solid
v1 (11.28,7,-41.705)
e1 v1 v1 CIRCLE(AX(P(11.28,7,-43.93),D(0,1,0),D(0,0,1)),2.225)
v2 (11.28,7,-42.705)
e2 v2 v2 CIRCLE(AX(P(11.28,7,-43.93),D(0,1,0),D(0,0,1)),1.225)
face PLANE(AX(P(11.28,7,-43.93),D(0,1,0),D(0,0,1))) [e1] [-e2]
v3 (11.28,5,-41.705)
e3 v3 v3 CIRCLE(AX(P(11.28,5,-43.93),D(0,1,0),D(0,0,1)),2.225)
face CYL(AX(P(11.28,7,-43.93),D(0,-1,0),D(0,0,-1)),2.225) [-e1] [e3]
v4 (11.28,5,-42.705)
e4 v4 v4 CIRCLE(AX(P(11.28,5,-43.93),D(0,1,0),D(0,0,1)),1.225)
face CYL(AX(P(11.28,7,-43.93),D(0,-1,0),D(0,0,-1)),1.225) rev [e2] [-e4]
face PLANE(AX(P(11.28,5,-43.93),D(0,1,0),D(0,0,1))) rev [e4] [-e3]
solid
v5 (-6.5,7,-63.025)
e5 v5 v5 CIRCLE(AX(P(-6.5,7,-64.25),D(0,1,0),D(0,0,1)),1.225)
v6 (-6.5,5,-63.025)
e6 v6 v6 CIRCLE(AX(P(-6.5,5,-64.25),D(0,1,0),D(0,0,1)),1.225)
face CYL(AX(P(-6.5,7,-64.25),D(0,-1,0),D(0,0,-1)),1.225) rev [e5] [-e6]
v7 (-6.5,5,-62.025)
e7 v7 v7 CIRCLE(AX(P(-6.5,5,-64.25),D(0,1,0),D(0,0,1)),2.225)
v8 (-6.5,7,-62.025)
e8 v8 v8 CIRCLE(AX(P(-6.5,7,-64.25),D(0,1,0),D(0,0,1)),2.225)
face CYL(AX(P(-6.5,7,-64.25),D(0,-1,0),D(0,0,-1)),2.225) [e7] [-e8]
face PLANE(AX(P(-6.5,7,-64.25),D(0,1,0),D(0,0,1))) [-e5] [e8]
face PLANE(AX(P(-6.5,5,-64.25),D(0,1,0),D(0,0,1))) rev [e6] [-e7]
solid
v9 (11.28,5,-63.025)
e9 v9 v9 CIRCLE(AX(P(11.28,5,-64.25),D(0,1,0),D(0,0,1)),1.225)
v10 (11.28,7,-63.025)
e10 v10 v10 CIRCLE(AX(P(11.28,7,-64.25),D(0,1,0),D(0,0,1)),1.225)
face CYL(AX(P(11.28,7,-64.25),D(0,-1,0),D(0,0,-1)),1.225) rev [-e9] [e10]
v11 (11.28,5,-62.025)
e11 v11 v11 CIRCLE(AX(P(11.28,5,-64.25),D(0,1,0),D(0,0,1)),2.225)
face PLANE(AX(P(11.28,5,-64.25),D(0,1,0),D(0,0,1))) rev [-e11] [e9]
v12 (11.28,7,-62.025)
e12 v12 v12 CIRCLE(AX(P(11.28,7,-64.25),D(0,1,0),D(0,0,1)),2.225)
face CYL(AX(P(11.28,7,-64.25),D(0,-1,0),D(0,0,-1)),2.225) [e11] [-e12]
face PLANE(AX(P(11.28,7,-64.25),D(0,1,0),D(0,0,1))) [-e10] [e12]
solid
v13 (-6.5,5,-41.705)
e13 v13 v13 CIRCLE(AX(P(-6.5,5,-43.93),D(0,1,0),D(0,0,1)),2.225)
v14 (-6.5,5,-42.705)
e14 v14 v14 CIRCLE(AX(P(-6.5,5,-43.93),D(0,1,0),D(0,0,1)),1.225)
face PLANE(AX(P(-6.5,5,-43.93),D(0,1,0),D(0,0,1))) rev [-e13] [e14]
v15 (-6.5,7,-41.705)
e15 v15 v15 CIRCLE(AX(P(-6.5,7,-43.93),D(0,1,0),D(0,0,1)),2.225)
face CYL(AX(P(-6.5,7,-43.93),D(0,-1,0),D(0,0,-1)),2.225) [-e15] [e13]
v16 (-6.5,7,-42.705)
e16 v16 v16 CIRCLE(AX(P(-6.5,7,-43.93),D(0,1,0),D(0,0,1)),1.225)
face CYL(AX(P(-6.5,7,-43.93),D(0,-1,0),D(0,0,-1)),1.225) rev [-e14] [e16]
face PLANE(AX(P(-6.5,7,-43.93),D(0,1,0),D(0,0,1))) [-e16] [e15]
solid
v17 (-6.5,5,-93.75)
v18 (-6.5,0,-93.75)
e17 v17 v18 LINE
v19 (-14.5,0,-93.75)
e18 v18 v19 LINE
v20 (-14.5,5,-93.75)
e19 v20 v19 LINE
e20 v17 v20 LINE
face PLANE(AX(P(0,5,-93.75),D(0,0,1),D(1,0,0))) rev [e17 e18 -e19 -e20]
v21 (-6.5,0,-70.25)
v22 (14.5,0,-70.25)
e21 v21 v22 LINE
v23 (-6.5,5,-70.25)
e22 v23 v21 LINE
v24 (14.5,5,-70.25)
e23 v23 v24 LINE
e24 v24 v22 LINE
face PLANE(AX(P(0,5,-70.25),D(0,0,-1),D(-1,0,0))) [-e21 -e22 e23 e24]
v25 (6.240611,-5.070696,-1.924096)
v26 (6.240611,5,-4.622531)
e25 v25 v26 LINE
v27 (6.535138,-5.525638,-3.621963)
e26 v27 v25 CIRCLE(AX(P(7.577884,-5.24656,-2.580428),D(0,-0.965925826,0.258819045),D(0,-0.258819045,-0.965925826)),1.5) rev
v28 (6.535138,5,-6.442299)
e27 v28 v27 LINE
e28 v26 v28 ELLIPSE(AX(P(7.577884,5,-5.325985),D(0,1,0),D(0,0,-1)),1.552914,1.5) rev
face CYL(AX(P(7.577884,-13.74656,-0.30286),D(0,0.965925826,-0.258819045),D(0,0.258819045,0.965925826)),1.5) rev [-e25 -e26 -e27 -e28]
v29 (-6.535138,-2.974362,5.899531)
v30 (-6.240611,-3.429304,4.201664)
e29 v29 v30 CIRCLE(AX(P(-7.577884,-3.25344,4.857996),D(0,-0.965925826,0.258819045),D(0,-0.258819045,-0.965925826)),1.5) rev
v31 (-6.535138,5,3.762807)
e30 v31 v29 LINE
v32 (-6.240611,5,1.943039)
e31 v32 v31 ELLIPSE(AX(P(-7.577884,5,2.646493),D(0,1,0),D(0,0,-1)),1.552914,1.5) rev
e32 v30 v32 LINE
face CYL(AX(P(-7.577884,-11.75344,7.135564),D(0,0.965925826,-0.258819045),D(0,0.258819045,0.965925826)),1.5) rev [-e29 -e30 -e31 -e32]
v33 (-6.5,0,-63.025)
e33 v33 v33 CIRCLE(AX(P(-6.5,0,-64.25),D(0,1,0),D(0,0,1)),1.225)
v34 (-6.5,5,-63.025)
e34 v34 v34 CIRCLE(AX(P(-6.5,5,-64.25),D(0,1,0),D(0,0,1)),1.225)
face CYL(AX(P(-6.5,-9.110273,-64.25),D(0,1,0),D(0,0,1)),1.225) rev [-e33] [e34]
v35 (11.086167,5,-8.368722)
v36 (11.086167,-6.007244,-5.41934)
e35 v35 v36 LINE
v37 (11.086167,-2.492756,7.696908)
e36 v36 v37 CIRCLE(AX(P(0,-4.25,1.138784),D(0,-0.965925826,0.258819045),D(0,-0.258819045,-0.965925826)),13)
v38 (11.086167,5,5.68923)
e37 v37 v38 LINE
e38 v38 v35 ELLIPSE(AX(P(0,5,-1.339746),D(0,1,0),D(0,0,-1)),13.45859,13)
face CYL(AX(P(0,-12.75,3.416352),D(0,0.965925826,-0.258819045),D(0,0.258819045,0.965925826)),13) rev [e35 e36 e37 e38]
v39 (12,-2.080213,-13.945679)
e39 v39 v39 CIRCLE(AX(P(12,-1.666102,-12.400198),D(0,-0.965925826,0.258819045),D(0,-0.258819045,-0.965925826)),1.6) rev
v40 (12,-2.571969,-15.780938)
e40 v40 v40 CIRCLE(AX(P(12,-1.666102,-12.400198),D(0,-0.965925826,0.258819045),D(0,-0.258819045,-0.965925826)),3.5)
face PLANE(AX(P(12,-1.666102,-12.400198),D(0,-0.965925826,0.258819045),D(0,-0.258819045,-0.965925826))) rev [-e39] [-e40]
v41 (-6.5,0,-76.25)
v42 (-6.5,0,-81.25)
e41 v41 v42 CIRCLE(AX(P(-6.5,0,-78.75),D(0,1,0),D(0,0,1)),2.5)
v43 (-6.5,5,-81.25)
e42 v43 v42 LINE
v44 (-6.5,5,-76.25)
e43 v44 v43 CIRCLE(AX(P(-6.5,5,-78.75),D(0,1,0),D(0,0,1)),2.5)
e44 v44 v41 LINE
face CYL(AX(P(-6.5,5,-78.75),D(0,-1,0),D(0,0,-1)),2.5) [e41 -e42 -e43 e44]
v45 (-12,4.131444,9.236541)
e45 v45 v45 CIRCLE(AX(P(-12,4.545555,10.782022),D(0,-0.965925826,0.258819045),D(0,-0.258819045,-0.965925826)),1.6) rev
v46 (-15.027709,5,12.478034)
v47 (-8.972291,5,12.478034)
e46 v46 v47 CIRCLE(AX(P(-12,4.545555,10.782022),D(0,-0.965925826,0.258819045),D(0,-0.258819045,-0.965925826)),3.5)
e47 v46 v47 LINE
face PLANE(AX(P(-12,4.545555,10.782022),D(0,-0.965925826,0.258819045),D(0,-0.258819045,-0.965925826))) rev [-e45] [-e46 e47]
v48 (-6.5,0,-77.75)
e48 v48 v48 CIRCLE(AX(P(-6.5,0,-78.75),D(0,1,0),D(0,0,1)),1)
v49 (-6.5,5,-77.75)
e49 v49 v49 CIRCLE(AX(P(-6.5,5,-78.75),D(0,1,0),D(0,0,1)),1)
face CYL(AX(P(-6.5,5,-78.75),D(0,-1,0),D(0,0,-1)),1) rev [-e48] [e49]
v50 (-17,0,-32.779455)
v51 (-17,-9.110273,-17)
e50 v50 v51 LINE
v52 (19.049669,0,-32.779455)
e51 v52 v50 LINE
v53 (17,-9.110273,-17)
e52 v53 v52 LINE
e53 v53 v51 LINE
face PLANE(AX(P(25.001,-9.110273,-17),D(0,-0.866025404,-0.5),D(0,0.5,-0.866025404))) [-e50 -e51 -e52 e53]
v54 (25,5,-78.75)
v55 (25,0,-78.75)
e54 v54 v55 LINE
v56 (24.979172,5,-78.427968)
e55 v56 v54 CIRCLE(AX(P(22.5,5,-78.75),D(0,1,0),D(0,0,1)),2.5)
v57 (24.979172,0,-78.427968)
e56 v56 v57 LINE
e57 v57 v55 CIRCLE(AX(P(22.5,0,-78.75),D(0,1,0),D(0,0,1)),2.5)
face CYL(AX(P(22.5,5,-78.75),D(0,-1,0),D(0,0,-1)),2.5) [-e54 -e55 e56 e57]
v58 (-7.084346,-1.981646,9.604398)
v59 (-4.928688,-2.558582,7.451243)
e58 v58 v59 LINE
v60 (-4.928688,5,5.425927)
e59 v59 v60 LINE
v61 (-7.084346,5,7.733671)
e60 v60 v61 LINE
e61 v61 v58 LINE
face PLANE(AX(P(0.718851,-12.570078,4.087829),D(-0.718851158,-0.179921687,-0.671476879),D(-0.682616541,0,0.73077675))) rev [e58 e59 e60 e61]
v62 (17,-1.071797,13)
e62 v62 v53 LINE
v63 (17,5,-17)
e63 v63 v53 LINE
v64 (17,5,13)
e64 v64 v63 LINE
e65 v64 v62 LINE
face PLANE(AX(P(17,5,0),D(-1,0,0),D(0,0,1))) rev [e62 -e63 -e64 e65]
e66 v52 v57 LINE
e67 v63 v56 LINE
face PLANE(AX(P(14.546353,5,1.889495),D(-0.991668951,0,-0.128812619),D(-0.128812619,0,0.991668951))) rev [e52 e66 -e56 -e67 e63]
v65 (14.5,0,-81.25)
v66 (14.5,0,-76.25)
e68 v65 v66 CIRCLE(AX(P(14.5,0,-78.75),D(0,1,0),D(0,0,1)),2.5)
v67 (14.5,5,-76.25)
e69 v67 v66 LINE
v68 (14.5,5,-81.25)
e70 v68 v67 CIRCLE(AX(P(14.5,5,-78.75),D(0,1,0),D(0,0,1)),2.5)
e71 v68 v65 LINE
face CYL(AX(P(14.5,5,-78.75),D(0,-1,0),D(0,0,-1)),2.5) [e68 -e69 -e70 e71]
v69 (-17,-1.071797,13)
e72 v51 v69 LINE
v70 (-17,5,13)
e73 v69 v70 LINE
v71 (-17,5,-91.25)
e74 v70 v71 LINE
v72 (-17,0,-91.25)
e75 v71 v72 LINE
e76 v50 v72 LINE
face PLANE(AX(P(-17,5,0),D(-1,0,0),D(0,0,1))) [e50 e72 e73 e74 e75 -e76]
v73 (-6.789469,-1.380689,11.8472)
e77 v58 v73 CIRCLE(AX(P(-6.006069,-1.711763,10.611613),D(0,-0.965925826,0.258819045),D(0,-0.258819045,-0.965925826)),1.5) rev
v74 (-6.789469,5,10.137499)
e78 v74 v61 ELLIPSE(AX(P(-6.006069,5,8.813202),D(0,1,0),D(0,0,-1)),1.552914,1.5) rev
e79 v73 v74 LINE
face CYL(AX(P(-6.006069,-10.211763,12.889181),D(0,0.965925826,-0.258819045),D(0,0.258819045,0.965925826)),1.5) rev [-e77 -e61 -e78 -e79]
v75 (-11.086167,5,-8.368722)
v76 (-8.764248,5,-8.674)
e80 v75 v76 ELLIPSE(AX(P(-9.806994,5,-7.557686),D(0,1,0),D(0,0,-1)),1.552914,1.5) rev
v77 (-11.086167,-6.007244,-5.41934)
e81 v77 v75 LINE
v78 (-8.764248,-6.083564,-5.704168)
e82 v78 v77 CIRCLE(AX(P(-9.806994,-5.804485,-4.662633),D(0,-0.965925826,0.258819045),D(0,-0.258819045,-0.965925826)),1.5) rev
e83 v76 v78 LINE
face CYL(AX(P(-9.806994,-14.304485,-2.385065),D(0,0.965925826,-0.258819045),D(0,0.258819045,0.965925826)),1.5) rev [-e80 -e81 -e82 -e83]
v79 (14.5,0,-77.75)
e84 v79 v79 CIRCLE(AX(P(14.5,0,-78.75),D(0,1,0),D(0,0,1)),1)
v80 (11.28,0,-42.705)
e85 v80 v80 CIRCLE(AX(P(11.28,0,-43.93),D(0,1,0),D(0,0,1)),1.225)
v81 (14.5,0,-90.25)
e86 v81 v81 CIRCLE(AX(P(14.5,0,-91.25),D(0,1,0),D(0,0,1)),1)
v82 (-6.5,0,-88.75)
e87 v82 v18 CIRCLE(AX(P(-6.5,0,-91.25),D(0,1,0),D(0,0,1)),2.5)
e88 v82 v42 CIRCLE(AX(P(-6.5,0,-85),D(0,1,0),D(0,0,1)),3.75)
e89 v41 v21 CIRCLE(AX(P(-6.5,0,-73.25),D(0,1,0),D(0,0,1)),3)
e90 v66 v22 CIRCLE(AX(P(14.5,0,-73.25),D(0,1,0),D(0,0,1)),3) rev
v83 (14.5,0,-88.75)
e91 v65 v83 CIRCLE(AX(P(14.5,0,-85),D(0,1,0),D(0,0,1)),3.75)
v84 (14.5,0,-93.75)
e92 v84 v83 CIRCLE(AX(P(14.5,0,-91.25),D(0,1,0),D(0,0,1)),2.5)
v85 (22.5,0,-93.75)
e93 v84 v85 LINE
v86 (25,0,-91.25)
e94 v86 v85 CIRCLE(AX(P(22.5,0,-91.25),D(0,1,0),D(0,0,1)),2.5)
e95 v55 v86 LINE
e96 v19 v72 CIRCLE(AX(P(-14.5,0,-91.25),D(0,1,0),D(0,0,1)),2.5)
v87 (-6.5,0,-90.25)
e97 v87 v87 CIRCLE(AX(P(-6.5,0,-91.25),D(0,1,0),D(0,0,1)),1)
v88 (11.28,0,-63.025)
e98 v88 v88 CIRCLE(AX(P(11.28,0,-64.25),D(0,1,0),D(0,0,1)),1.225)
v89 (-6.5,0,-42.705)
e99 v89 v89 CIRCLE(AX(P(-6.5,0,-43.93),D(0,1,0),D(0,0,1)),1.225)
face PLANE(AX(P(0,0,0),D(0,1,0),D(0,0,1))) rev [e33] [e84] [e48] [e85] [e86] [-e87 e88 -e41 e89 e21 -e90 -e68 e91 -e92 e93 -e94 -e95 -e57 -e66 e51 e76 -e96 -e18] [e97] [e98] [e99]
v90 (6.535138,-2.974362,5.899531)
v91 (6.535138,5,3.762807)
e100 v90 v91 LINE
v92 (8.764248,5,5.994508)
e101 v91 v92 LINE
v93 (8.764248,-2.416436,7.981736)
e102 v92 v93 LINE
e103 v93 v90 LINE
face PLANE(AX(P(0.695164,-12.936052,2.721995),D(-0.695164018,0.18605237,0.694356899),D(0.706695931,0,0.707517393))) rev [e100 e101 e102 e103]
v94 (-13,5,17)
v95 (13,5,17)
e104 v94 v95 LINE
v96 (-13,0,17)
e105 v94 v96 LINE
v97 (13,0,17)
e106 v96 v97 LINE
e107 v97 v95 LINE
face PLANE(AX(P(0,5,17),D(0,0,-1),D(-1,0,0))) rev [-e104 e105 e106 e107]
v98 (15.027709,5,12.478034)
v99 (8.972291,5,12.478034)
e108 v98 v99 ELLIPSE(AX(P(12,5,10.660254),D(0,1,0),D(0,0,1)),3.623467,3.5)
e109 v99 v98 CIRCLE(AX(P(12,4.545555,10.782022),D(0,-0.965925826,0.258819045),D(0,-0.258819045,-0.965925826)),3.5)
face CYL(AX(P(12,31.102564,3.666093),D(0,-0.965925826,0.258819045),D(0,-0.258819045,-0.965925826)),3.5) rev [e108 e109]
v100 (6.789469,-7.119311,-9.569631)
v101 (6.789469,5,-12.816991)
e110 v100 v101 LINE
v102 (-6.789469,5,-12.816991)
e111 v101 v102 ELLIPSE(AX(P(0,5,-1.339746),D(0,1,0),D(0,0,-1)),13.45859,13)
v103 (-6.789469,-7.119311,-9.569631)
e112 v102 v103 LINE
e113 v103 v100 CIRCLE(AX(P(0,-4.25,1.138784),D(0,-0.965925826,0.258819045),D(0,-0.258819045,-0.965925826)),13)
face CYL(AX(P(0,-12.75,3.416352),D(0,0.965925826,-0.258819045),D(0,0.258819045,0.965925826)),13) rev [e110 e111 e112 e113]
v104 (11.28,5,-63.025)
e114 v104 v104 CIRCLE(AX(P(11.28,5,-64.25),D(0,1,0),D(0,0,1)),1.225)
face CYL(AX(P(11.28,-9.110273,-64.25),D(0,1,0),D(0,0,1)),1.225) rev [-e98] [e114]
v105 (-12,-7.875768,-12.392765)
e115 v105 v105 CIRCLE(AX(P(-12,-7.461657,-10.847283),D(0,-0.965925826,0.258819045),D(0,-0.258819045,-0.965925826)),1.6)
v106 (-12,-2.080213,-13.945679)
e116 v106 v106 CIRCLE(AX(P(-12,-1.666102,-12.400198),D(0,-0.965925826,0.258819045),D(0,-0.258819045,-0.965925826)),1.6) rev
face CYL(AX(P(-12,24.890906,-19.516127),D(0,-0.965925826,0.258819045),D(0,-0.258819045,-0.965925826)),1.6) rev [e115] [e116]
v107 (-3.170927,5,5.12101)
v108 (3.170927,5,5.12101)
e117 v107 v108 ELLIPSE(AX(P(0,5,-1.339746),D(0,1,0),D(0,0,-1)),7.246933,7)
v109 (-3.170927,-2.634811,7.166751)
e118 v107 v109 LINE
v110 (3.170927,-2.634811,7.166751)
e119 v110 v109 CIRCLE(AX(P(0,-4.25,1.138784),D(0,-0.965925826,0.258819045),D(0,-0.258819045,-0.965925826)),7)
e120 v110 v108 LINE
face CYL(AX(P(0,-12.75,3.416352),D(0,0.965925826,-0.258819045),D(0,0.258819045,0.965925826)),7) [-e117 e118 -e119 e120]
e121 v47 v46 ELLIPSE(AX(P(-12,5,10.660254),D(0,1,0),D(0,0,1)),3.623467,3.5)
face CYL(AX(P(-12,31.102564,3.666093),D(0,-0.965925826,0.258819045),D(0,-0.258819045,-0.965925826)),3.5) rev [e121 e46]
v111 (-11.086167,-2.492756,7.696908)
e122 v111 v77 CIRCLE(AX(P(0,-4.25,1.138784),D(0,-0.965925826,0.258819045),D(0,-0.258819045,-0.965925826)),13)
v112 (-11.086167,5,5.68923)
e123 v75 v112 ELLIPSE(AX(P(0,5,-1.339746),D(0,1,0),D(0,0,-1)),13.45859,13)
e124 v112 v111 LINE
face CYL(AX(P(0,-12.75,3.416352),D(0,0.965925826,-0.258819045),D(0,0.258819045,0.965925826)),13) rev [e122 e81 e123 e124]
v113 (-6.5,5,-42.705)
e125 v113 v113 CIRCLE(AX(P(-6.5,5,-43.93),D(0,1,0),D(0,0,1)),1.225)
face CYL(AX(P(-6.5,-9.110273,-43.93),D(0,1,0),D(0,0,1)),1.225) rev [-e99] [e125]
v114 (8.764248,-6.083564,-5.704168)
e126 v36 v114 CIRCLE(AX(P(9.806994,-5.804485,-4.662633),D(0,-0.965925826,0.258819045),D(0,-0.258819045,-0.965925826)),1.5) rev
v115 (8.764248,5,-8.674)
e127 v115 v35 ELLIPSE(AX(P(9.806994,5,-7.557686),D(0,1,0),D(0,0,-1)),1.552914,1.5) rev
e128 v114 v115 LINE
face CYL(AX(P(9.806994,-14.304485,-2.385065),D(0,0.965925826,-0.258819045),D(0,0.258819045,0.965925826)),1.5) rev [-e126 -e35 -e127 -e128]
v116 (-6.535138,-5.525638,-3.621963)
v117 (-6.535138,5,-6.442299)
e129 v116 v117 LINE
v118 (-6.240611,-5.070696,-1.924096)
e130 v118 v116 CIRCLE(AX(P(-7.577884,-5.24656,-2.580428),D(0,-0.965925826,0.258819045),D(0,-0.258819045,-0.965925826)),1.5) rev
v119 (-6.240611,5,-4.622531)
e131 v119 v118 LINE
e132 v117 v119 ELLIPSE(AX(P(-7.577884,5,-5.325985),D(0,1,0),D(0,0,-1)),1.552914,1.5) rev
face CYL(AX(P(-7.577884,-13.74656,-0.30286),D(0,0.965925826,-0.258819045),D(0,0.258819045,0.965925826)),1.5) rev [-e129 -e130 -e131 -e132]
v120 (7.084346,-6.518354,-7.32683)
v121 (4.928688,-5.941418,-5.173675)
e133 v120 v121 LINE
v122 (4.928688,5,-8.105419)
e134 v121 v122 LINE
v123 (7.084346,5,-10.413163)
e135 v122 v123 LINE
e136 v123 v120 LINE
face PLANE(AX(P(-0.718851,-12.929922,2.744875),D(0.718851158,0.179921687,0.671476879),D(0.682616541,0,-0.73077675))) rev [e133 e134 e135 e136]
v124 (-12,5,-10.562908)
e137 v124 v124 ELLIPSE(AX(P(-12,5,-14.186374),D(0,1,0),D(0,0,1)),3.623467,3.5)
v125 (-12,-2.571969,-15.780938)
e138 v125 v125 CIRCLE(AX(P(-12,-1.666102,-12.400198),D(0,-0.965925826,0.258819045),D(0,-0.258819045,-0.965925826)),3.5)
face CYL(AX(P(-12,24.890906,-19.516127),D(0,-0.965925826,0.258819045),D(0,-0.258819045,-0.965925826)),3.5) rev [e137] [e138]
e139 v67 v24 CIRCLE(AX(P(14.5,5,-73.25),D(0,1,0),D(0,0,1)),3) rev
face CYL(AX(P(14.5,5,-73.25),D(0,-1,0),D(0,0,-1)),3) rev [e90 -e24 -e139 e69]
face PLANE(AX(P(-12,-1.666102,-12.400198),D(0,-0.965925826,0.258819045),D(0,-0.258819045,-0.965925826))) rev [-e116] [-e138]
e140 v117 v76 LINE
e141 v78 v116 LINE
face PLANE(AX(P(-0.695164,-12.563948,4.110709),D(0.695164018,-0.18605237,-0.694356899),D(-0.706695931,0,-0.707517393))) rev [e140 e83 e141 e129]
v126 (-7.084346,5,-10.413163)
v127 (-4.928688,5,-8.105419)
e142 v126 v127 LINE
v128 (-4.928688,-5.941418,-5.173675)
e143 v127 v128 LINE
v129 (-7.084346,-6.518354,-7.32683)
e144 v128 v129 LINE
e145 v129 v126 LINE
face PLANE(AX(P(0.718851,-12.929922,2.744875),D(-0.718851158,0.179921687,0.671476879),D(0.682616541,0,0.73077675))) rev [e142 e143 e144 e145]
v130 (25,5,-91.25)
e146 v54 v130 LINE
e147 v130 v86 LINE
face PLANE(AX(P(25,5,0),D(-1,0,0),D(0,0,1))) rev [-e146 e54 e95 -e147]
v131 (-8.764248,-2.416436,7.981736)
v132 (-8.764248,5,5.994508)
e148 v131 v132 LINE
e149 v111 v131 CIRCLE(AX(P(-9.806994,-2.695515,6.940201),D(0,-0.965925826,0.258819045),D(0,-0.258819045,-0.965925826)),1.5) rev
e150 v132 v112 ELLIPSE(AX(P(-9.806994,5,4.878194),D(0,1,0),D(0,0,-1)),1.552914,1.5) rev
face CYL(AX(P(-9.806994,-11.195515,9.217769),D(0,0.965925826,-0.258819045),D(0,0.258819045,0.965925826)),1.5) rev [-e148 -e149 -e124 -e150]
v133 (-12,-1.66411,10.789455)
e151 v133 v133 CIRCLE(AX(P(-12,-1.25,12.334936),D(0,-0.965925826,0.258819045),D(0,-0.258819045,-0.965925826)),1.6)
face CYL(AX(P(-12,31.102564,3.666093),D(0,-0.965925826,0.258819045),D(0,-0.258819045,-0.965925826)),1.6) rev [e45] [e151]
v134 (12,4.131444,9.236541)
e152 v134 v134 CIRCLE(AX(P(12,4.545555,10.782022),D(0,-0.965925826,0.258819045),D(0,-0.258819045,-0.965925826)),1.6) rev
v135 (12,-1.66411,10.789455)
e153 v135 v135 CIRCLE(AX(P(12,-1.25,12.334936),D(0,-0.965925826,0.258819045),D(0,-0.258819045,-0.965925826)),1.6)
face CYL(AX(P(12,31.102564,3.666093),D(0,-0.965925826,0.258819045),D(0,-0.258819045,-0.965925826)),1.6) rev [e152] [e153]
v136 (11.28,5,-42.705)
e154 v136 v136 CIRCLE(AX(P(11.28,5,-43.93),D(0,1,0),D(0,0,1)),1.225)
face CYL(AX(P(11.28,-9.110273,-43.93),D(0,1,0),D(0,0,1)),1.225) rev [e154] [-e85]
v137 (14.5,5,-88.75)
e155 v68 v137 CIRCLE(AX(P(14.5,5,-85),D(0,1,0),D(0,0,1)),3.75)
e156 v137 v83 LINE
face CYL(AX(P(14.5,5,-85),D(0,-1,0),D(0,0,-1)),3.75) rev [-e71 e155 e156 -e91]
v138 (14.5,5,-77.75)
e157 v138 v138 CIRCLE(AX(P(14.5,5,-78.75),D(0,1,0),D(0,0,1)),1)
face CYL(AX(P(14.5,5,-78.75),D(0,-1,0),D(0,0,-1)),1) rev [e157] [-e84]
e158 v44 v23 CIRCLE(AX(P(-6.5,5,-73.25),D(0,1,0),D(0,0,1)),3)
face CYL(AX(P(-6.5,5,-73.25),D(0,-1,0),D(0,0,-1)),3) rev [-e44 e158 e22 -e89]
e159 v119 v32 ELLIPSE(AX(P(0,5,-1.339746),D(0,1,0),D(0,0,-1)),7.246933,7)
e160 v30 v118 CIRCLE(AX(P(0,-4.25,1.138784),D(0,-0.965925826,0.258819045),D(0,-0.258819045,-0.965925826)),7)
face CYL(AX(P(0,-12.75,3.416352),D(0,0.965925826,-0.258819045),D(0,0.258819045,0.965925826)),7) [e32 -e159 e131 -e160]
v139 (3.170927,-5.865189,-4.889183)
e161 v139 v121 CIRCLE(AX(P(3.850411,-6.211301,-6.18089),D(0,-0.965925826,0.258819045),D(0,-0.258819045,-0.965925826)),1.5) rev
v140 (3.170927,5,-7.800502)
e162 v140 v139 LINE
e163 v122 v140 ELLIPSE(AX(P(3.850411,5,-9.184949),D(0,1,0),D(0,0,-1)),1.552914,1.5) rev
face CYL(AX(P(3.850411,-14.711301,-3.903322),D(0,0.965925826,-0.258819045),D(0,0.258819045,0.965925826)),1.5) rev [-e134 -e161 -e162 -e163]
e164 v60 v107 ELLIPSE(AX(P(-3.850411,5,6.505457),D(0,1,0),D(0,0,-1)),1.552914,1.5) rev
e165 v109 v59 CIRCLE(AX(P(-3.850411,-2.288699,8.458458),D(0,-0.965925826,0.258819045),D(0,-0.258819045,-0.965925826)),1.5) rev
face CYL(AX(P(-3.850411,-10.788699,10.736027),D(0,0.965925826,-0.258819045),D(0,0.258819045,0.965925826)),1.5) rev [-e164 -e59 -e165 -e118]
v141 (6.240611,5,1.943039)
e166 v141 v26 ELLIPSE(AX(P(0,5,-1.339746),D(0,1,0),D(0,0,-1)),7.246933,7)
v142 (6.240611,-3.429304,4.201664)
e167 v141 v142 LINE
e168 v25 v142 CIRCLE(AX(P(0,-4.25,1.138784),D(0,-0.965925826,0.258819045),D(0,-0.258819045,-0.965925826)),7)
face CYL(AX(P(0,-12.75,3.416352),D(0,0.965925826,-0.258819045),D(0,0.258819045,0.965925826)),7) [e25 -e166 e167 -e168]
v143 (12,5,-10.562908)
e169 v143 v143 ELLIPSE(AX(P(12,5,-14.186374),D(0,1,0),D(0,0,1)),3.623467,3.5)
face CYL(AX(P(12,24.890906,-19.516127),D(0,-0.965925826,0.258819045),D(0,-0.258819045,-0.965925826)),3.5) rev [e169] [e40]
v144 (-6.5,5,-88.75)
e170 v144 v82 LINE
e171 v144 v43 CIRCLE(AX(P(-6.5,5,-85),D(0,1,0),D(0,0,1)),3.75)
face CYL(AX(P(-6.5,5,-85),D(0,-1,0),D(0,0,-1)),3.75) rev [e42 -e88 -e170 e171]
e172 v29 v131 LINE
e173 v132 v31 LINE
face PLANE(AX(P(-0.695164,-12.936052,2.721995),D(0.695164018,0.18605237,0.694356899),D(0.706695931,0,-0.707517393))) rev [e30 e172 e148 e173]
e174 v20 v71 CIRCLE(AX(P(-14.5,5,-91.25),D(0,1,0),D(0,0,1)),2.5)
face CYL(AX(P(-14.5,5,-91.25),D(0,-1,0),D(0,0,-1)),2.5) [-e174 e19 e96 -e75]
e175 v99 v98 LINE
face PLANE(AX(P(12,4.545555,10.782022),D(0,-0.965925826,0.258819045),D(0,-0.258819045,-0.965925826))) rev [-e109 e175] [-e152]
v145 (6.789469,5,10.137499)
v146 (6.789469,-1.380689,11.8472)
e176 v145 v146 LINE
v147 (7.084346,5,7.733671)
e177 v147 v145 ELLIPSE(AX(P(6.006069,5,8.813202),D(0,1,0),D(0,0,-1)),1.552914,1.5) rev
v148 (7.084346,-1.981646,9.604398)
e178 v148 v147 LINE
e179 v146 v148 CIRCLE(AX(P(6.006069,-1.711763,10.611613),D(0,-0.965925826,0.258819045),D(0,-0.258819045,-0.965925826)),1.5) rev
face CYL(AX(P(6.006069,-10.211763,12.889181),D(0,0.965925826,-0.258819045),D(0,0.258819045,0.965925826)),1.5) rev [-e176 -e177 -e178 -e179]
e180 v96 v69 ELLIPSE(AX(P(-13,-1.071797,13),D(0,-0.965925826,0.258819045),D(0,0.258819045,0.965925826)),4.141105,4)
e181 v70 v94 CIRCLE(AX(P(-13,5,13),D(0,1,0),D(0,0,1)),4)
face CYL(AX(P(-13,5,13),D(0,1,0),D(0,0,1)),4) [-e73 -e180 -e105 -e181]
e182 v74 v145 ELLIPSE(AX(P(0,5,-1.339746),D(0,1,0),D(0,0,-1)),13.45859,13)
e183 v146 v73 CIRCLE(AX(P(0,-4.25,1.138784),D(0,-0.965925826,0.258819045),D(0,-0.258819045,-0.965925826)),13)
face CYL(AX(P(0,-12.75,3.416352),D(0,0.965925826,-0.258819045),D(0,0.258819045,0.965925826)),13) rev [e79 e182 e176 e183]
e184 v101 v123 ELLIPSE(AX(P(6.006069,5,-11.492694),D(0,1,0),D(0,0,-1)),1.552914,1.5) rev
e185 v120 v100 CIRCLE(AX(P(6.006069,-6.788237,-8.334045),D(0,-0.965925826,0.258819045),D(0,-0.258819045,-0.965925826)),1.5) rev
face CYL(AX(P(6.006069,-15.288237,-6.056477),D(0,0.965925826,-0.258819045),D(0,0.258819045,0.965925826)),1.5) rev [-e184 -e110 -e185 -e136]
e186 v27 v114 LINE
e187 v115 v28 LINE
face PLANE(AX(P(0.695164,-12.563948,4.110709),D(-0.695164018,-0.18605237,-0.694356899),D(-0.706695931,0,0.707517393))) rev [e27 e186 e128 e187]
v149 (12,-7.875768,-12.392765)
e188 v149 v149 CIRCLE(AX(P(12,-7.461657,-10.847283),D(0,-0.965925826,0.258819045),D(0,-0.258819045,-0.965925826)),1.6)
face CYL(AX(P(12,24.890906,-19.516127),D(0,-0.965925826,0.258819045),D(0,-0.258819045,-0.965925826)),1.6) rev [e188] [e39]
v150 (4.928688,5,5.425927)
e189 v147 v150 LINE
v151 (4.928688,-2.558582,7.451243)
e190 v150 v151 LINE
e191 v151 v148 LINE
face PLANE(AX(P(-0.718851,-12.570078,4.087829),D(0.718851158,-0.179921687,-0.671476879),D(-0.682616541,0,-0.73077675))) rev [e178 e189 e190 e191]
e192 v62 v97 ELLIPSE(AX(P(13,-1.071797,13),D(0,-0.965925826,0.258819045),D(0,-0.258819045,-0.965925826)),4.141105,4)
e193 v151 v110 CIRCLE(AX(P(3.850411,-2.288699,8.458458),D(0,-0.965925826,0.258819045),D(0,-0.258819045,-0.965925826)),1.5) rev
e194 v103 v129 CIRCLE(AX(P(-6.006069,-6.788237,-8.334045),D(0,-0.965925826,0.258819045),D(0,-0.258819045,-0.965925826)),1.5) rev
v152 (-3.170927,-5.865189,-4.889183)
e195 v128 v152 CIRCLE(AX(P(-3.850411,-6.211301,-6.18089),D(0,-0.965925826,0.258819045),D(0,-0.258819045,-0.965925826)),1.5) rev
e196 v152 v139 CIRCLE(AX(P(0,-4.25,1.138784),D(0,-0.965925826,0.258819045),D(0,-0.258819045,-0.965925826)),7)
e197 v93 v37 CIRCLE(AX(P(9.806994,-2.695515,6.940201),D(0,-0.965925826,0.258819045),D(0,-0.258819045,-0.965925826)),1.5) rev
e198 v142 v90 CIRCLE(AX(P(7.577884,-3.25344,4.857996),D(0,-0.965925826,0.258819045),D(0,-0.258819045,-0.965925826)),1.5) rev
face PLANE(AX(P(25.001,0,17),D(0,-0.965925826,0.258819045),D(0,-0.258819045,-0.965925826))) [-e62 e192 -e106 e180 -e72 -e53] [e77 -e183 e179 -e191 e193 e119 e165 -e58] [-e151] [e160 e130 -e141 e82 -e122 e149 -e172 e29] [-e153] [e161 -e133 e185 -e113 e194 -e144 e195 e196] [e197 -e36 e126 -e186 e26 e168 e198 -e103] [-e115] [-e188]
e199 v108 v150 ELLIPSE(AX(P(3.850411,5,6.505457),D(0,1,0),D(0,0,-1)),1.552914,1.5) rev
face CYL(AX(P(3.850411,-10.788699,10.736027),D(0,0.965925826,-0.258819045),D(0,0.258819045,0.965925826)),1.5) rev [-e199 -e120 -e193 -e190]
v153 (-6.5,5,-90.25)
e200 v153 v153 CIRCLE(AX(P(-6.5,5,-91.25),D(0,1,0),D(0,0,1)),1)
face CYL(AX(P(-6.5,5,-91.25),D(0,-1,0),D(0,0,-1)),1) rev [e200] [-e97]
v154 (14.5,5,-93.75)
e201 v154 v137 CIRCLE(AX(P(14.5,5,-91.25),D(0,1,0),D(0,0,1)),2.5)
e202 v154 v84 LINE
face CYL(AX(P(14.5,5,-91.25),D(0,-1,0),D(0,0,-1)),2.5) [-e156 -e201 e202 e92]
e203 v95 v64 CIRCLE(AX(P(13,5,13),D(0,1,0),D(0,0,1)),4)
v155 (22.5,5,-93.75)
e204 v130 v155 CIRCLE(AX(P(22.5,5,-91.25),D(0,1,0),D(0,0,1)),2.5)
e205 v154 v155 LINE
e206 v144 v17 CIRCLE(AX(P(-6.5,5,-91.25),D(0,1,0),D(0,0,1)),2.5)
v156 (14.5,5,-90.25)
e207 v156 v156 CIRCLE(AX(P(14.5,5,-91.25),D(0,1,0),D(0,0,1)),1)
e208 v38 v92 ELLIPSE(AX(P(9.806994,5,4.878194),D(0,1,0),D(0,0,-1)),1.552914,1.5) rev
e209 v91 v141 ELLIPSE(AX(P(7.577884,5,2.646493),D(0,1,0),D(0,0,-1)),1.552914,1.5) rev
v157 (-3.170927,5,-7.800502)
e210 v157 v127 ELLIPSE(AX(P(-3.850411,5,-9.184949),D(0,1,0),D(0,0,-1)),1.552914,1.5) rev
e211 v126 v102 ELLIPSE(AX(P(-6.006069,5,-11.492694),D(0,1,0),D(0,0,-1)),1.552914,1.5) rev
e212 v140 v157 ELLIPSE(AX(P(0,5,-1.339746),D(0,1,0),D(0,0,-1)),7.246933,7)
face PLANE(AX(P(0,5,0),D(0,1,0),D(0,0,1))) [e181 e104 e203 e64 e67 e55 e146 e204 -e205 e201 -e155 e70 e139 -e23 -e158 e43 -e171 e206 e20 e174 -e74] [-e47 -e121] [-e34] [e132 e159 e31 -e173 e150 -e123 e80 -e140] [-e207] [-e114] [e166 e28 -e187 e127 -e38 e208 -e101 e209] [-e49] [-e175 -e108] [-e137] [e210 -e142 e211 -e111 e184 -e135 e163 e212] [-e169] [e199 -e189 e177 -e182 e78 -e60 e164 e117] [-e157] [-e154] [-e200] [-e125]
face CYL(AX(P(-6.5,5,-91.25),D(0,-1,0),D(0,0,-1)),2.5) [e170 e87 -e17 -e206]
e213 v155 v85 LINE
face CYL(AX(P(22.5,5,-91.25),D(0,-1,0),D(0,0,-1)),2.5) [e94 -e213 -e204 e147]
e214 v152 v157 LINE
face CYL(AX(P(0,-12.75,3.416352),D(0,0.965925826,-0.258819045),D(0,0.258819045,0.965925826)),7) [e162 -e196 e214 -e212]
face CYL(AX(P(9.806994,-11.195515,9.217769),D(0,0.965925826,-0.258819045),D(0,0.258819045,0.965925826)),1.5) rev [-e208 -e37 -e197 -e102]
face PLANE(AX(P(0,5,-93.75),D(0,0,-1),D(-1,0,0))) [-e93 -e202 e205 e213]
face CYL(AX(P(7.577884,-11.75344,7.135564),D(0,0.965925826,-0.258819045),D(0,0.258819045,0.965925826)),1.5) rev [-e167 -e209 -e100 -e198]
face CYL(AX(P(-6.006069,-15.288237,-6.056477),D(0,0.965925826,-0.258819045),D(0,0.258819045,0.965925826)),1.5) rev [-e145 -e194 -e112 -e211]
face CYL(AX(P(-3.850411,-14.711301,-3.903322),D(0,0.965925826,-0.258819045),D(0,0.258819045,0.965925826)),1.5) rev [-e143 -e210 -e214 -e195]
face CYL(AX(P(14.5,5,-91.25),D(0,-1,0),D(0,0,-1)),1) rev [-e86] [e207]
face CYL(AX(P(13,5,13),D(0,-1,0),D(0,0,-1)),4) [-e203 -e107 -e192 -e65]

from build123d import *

# Parameters (mm, degrees)
SKETCH1_R                = 1
BOSS_EXTRUDE1_DEPTH      = 5
BOSS_EXTRUDE3_START      = -36.049668807
BOSS_EXTRUDE3_DEPTH      = 36.049668807
BOSS_EXTRUDE3_START_2    = -10
BOSS_EXTRUDE3_2_DEPTH    = 10
SKETCH7_R                = 1.6
CUT_EXTRUDE3_DEPTH       = 99.561878238
SKETCH8_R                = 3.5
CUT_EXTRUDE4_DEPTH       = 98.211785554
FILLET1_R                = 4
CUT_EXTRUDE1_DEPTH       = 99.633430775
FILLET2_R                = 1.5
CIRPATTERN1_COUNT        = 4
FILLET2_OF_CIRPATTERN1_R = 1.5
SKETCH3_R                = 1.225
CUT_EXTRUDE2_DEPTH       = 99.04673524
SKETCH3_3_R              = 2.225
SKETCH3_3_R_2            = 1.225
BOSS_EXTRUDE2_DEPTH      = 2
BOSS_EXTRUDE2_2_DEPTH    = 2
BOSS_EXTRUDE2_3_DEPTH    = 2
BOSS_EXTRUDE2_4_DEPTH    = 2


with BuildPart() as part:
    # Sketch1 → Boss-Extrude1 (new body)
    with BuildSketch(Plane(origin=(0, 0, 0), x_dir=(1, 0, 0), z_dir=(0, 1, 0))):
        with BuildLine():
            Line((17, -17), (17, 17))
            Line((17, 17), (24.979172378, 78.427968452))
            ThreePointArc((24.979172378, 78.427968452), (24.994787661, 78.588647817), (25, 78.75))
            Line((25, 78.75), (25, 91.25))
            ThreePointArc((25, 91.25), (24.267766953, 93.017766953), (22.5, 93.75))
            Line((22.5, 93.75), (14.5, 93.75))
            ThreePointArc((14.5, 93.75), (12, 91.25), (14.5, 88.75))
            ThreePointArc((14.5, 88.75), (18.25, 85), (14.5, 81.25))
            ThreePointArc((14.5, 81.25), (12, 78.75), (14.5, 76.25))
            ThreePointArc((14.5, 76.25), (17.5, 73.25), (14.5, 70.25))
            Line((14.5, 70.25), (-6.5, 70.25))
            ThreePointArc((-6.5, 70.25), (-9.5, 73.25), (-6.5, 76.25))
            ThreePointArc((-6.5, 76.25), (-4, 78.75), (-6.5, 81.25))
            ThreePointArc((-6.5, 81.25), (-10.25, 85), (-6.5, 88.75))
            ThreePointArc((-6.5, 88.75), (-4, 91.25), (-6.5, 93.75))
            Line((-6.5, 93.75), (-14.5, 93.75))
            ThreePointArc((-14.5, 93.75), (-16.267766953, 93.017766953), (-17, 91.25))
            Line((-17, 91.25), (-17, -17))
            Line((-17, -17), (17, -17))
        make_face()
        with Locations(Location((-6.5, 78.75, 0), (0, 0, 270))):
            Circle(SKETCH1_R, mode=Mode.SUBTRACT)
        with Locations(Location((-6.5, 91.25, 0), (0, 0, 270))):
            Circle(SKETCH1_R, mode=Mode.SUBTRACT)
        with Locations(Location((14.5, 78.75, 0), (0, 0, 270))):
            Circle(SKETCH1_R, mode=Mode.SUBTRACT)
        with Locations(Location((14.5, 91.25, 0), (0, 0, 270))):
            Circle(SKETCH1_R, mode=Mode.SUBTRACT)
    extrude(amount=BOSS_EXTRUDE1_DEPTH)

    # Boss-Extrude3: read off the stored shape, not the designer's step
    # Boss-Extrude3 outline → Boss-Extrude3 (add)
    with BuildSketch(Plane.ZY.offset(17).offset(BOSS_EXTRUDE3_START)):
        Polygon((-32.779454915, 0), (-17, -9.110272543), (17, 0), align=None)
    extrude(amount=BOSS_EXTRUDE3_DEPTH)

    # Boss-Extrude3 2 outline → Boss-Extrude3 2 (cut)
    with BuildSketch(Plane(origin=(0, 0, 0), x_dir=(1, 0, 0), z_dir=(0, 1, 0)).offset(BOSS_EXTRUDE3_START_2)):
        Polygon((19.049668807, 32.779454915), (17, 17), (17, -18), (19.049668807, -18), align=None)
    extrude(amount=BOSS_EXTRUDE3_2_DEPTH, mode=Mode.SUBTRACT)

    # Sketch7 → Cut-Extrude3 (cut, through all)
    with BuildSketch(Plane(origin=(0, -4.25, 1.138784068), x_dir=(1, 0, 0), z_dir=(0, -0.96592582628907, 0.25881904510251447))):
        with Locations(Location((-12, 11.591109915, 0), (0, 0, 270))):
            Circle(SKETCH7_R)
        with Locations(Location((12, 11.591109915, 0), (0, 0, 270))):
            Circle(SKETCH7_R)
        with Locations(Location((12, -12.408890085, 0), (0, 0, 270))):
            Circle(SKETCH7_R)
        with Locations(Location((-12, -12.408890085, 0), (0, 0, 270))):
            Circle(SKETCH7_R)
    extrude(amount=-CUT_EXTRUDE3_DEPTH, mode=Mode.SUBTRACT)

    # Sketch8 → Cut-Extrude4 (cut, through all)
    with BuildSketch(Plane(origin=(0, 1.545554958, -0.414130203), x_dir=(-1, 0, 0), z_dir=(0, -0.96592582628907, 0.25881904510251447))):
        with Locations(Location((-12, 12.408890085, 0), (0, 0, 90))):
            Circle(SKETCH8_R)
        with Locations(Location((12, 12.408890085, 0), (0, 0, 90))):
            Circle(SKETCH8_R)
        with Locations((12, -11.591109915)):
            Circle(SKETCH8_R)
        with Locations((-12, -11.591109915)):
            Circle(SKETCH8_R)
    extrude(amount=-CUT_EXTRUDE4_DEPTH, mode=Mode.SUBTRACT)

    # Fillet1
    fillet1_edges = [part.edges().sort_by_distance(p)[0] for p in [
        (17, 2.5, 17),
        (-17, 2.5, 17),
    ]]
    fillet(fillet1_edges, radius=FILLET1_R)

    # Sketch2 → Cut-Extrude1 (cut, symmetric)
    with BuildSketch(Plane(origin=(0, -4.229552898, 1.215093691), x_dir=(1, 0, 0), z_dir=(0, 0.96592582628907, -0.25881904510251447))):
        with BuildLine():
            ThreePointArc((8.291504335, 10.091541465), (0, 13.079001535), (-8.291504335, 10.091541465))
            Line((-8.291504335, 10.091541465), (-4.09738644, 5.754512468))
            ThreePointArc((-4.09738644, 5.754512468), (0, 7.079001535), (4.09738644, 5.754512468))
            Line((4.09738644, 5.754512468), (8.291504335, 10.091541465))
        make_face()
    cut_extrude1 = extrude(amount=CUT_EXTRUDE1_DEPTH, both=True, mode=Mode.SUBTRACT)

    # Fillet2
    fillet2_edges = [part.edges().sort_by_distance(p)[0] for p in [
        (-4.09738644, -0.35946516, -5.779402882),
        (8.291504335, -0.920718012, -10.119038447),
        (4.09738644, -0.35946516, -5.779402882),
        (-8.291504335, -0.920718012, -10.119038447),
    ]]
    fillet(fillet2_edges, radius=FILLET2_R)

    # CirPattern1: Cut-Extrude1 ×4 about axis
    cirpattern1_axis = Axis((0, 0, 0), (0, 0.96592582628907, -0.25881904510251447))
    for i in range(1, CIRPATTERN1_COUNT):
        add(cut_extrude1.rotate(cirpattern1_axis, i * 360 / CIRPATTERN1_COUNT), mode=Mode.SUBTRACT)

    # Fillet2 of CirPattern1
    fillet2_of_cirpattern1_edges = [part.edges().sort_by_distance(p)[0] for p in [
        (-5.675510934, 2.169946806, 3.660491089),
        (-10.01253993, -0.475281223, -8.456645718),
        (-5.675510934, 0.048983514, -4.255051677),
        (-10.01253993, 3.816717246, 7.561310634),
        (4.09738644, 2.57839548, 5.184842294),
        (-8.291504335, 4.262154036, 9.223703363),
        (-4.09738644, 2.57839548, 5.184842294),
        (8.291504335, 4.262154036, 9.223703363),
        (5.675510934, 0.048983514, -4.255051677),
        (10.01253993, 3.816717246, 7.561310634),
        (5.675510934, 2.169946806, 3.660491089),
        (10.01253993, -0.475281223, -8.456645718),
    ]]
    fillet(fillet2_of_cirpattern1_edges, radius=FILLET2_OF_CIRPATTERN1_R)

    # Sketch3 → Cut-Extrude2 (cut, through all)
    with BuildSketch(Plane(origin=(0, 5, 0), x_dir=(1, 0, 0), z_dir=(0, 1, 0))):
        with Locations(Location((-6.5, 64.25, 0), (0, 0, 270))):
            Circle(SKETCH3_R)
        with Locations(Location((11.28, 64.25, 0), (0, 0, 270))):
            Circle(SKETCH3_R)
        with Locations(Location((11.28, 43.93, 0), (0, 0, 270))):
            Circle(SKETCH3_R)
        with Locations(Location((-6.5, 43.93, 0), (0, 0, 270))):
            Circle(SKETCH3_R)
    extrude(amount=-CUT_EXTRUDE2_DEPTH, mode=Mode.SUBTRACT)


with BuildPart() as body_2:
    # Sketch3<3> → Boss-Extrude2 (new body)
    with BuildSketch(Plane(origin=(0, 5, 0), x_dir=(1, 0, 0), z_dir=(0, 1, 0))):
        with Locations(Location((-6.5, 64.25, 0), (0, 0, 270))):
            Circle(SKETCH3_3_R)
        with Locations(Location((-6.5, 64.25, 0), (0, 0, 270))):
            Circle(SKETCH3_3_R_2, mode=Mode.SUBTRACT)
    extrude(amount=BOSS_EXTRUDE2_DEPTH)


with BuildPart() as body_3:
    # Sketch3<3> → Boss-Extrude2 2 (new body)
    with BuildSketch(Plane(origin=(0, 5, 0), x_dir=(1, 0, 0), z_dir=(0, 1, 0))):
        with Locations(Location((11.28, 64.25, 0), (0, 0, 270))):
            Circle(SKETCH3_3_R)
        with Locations(Location((11.28, 64.25, 0), (0, 0, 270))):
            Circle(SKETCH3_3_R_2, mode=Mode.SUBTRACT)
    extrude(amount=BOSS_EXTRUDE2_2_DEPTH)


with BuildPart() as body_4:
    # Sketch3<3> → Boss-Extrude2 3 (new body)
    with BuildSketch(Plane(origin=(0, 5, 0), x_dir=(1, 0, 0), z_dir=(0, 1, 0))):
        with Locations(Location((11.28, 43.93, 0), (0, 0, 270))):
            Circle(SKETCH3_3_R)
        with Locations(Location((11.28, 43.93, 0), (0, 0, 270))):
            Circle(SKETCH3_3_R_2, mode=Mode.SUBTRACT)
    extrude(amount=BOSS_EXTRUDE2_3_DEPTH)


with BuildPart() as body_5:
    # Sketch3<3> → Boss-Extrude2 4 (new body)
    with BuildSketch(Plane(origin=(0, 5, 0), x_dir=(1, 0, 0), z_dir=(0, 1, 0))):
        with Locations(Location((-6.5, 43.93, 0), (0, 0, 270))):
            Circle(SKETCH3_3_R)
        with Locations(Location((-6.5, 43.93, 0), (0, 0, 270))):
            Circle(SKETCH3_3_R_2, mode=Mode.SUBTRACT)
    extrude(amount=BOSS_EXTRUDE2_4_DEPTH)


solid = Compound([part.part, body_2.part, body_3.part, body_4.part, body_5.part])
